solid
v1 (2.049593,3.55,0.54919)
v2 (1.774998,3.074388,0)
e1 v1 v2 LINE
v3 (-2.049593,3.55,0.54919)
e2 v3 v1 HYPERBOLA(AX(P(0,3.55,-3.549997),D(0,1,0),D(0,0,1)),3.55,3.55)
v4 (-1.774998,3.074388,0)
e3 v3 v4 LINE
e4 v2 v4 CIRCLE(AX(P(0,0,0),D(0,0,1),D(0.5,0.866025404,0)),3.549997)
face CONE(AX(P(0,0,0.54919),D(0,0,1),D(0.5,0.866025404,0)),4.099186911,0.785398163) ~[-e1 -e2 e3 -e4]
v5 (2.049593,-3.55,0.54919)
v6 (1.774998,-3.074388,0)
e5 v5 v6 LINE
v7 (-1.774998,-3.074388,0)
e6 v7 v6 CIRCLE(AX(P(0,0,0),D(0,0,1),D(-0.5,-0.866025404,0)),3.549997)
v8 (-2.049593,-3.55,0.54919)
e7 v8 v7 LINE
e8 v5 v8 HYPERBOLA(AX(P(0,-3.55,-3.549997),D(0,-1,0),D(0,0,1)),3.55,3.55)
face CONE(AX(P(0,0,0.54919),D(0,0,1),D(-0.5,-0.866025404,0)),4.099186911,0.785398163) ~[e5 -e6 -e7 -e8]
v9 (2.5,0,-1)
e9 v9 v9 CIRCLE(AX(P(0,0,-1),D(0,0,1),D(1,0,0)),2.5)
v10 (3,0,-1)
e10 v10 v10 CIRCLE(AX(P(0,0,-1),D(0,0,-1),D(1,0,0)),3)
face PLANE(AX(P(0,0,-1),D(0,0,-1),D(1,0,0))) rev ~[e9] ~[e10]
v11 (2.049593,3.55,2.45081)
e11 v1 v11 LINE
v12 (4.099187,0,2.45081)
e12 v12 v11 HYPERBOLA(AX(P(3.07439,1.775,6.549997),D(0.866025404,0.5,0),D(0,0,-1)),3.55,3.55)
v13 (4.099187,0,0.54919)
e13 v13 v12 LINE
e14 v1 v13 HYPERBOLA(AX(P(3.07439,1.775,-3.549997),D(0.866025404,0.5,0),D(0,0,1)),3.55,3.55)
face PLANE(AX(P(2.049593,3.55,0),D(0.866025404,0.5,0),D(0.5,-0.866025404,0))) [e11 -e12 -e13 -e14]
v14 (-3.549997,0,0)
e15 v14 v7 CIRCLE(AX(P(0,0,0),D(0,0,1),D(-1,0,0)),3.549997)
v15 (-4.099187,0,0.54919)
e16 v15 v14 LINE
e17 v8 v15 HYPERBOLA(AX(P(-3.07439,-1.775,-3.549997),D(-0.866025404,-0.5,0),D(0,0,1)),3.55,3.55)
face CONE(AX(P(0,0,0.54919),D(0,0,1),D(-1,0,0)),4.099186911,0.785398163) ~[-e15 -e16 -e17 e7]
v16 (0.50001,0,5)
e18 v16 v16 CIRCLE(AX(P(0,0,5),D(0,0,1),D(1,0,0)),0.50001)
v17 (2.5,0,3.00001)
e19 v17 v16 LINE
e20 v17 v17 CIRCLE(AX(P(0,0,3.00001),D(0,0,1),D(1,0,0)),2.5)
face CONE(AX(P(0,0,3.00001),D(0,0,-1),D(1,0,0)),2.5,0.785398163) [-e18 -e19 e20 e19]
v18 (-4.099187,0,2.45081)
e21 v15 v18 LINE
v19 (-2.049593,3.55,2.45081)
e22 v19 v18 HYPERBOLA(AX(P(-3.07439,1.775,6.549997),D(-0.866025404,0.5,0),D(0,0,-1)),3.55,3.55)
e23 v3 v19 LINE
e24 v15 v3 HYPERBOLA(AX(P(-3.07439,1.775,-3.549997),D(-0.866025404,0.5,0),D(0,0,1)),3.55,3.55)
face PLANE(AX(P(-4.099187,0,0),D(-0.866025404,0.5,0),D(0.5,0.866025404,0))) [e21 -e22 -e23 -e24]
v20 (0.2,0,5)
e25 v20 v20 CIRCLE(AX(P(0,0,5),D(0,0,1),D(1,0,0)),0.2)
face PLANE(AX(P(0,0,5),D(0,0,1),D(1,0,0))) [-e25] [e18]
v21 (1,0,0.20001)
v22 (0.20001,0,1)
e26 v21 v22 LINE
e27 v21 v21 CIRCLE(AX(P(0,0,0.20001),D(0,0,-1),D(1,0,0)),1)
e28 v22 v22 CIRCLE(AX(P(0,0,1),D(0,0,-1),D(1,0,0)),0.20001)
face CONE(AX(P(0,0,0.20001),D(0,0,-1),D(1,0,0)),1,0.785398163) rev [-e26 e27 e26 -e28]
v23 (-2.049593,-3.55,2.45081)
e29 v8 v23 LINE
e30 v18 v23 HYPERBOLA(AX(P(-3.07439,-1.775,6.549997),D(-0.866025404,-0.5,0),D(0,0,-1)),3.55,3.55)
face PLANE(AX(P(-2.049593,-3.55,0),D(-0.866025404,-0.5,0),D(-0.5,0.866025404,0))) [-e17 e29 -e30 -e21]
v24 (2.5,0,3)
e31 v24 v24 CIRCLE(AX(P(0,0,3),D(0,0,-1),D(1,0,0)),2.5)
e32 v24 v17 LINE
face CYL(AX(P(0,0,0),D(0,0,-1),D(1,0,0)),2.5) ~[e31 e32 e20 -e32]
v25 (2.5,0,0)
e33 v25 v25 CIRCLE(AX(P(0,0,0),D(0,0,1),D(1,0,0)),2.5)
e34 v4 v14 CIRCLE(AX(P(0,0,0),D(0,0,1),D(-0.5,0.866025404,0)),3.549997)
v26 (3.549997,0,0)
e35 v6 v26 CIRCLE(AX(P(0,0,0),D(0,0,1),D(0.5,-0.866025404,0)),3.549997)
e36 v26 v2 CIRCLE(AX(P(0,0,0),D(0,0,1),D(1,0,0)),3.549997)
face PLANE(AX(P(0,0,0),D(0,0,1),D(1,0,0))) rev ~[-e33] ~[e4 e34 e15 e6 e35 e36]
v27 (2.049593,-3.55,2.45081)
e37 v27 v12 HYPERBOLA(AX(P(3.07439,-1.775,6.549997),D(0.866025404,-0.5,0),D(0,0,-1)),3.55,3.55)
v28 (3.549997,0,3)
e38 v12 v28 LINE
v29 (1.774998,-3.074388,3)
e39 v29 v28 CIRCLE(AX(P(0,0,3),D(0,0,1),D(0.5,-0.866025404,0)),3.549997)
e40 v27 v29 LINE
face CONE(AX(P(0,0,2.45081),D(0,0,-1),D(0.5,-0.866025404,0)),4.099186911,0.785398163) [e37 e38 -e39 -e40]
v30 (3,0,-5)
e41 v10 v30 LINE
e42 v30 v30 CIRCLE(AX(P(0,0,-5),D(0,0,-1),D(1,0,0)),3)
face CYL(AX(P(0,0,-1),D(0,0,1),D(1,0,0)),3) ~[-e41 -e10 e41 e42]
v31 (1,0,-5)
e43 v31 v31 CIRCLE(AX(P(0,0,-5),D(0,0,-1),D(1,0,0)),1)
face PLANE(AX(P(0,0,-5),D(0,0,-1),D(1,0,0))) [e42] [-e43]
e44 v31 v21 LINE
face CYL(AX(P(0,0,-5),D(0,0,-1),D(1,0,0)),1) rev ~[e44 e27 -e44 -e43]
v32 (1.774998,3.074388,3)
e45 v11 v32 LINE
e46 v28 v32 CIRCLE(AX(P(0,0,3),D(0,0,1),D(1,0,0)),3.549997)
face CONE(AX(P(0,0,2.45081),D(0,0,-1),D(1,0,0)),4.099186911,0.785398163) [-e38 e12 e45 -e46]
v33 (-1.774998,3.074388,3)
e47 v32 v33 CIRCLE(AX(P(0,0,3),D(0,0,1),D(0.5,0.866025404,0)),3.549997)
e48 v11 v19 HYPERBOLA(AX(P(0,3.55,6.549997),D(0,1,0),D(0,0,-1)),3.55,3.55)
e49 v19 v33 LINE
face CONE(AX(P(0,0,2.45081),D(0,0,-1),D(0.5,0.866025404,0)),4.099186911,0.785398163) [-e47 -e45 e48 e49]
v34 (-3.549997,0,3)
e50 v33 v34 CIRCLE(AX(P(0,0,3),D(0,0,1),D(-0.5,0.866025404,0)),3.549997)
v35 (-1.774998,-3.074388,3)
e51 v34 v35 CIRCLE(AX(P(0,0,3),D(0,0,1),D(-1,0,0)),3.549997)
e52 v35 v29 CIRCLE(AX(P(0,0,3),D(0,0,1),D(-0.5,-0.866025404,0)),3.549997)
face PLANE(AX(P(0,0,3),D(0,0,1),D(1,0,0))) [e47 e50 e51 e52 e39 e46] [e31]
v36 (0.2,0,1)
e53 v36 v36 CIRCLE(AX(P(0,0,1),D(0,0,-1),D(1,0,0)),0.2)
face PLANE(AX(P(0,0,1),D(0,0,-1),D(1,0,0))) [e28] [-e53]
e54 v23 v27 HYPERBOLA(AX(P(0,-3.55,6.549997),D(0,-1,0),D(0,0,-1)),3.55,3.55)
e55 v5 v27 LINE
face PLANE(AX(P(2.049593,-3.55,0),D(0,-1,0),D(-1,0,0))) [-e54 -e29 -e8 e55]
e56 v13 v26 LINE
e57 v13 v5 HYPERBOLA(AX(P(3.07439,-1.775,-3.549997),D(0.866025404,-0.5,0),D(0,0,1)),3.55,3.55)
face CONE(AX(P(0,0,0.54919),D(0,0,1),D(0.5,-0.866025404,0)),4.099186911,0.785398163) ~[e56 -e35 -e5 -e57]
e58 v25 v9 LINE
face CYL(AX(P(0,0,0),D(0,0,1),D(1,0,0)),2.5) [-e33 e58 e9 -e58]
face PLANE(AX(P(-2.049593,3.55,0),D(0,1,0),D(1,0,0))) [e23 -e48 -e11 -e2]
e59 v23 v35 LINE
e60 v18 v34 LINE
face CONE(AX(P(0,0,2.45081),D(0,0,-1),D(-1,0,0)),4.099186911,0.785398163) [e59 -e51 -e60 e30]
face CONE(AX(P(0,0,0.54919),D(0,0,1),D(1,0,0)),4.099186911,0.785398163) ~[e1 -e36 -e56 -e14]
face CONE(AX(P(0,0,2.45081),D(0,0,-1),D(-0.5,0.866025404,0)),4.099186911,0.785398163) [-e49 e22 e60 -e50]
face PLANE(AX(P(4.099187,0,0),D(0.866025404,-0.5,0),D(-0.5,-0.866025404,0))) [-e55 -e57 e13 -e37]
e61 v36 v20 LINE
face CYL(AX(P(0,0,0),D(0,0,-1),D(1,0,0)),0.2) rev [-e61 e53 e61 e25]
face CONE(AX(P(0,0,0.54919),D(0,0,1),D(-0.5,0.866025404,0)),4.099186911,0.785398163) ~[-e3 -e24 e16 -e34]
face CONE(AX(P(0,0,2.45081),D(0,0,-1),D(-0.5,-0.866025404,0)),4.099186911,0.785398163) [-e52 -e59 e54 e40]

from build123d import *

# Parameters (mm, degrees)
F0_R      = 2.5
F0_R_2    = 0.2
F1_DEPTH  = 3
F2_SIZE   = 0.54919
F3_DEPTH  = 3.001
F4_DEPTH  = 5
F5_SIZE   = 1.99999
F6_DEPTH  = 1
F7_R      = 3
F7_R_2    = 2.5
F7_R_3    = 0.2
F8_DEPTH  = 4
F9_R      = 1
F9_R_2    = 0.2
F10_DEPTH = 6
F11_SIZE  = 0.79999


# Not quite as in the source:
# - a fillet or chamfer is up to 0.001 mm smaller than in the source, because OpenCascade refuses the exact size


with BuildPart() as f1:
    # F0 (on Top) → F1 (new body)
    with BuildSketch(Plane.XY):
        Polygon((2.0495934556, 3.55), (-2.0495934556, 3.55), (-4.0991869112, 0), (-2.0495934556, -3.55), (2.0495934556, -3.55), (4.0991869112, 0), align=None)
        Circle(F0_R, mode=Mode.SUBTRACT)
        with BuildLine():
            Line((-4.0991869112, 0), (-2.0495934556, 3.55))
            ThreePointArc((-2.0495934556, 3.55), (-3.55, 2.0495934556), (-4.0991869112, 0))
        make_face()
        with BuildLine():
            Line((-2.0495934556, -3.55), (-4.0991869112, 0))
            ThreePointArc((-4.0991869112, 0), (-3.55, -2.0495934556), (-2.0495934556, -3.55))
        make_face()
        with BuildLine():
            ThreePointArc((2.0495934556, 3.55), (0, 4.0991869112), (-2.0495934556, 3.55))
            Line((-2.0495934556, 3.55), (2.0495934556, 3.55))
        make_face()
        with BuildLine():
            ThreePointArc((4.0991869112, 0), (3.55, 2.0495934556), (2.0495934556, 3.55))
            Line((2.0495934556, 3.55), (4.0991869112, 0))
        make_face()
        with BuildLine():
            ThreePointArc((2.0495934556, -3.55), (3.55, -2.0495934556), (4.0991869112, 0))
            Line((4.0991869112, 0), (2.0495934556, -3.55))
        make_face()
        with BuildLine():
            Line((2.0495934556, -3.55), (-2.0495934556, -3.55))
            ThreePointArc((-2.0495934556, -3.55), (0, -4.0991869112), (2.0495934556, -3.55))
        make_face()
        Circle(F0_R)
        Circle(F0_R_2, mode=Mode.SUBTRACT)
    extrude(amount=F1_DEPTH)

    # F2
    f2_edges = [f1.edges().sort_by_distance(p)[0] for p in [
        (2.049593, 3.55, 3),
        (2.049593, 3.55, 0),
    ]]
    chamfer(f2_edges, length=F2_SIZE)

    # F0 (on Top) → F3 (cut, through all)
    with BuildSketch(Plane.XY):
        with BuildLine():
            Line((2.0495934556, -3.55), (-2.0495934556, -3.55))
            ThreePointArc((-2.0495934556, -3.55), (0, -4.0991869112), (2.0495934556, -3.55))
        make_face()
        with BuildLine():
            ThreePointArc((2.0495934556, -3.55), (3.55, -2.0495934556), (4.0991869112, 0))
            Line((4.0991869112, 0), (2.0495934556, -3.55))
        make_face()
        with BuildLine():
            Line((-2.0495934556, -3.55), (-4.0991869112, 0))
            ThreePointArc((-4.0991869112, 0), (-3.55, -2.0495934556), (-2.0495934556, -3.55))
        make_face()
        with BuildLine():
            ThreePointArc((4.0991869112, 0), (3.55, 2.0495934556), (2.0495934556, 3.55))
            Line((2.0495934556, 3.55), (4.0991869112, 0))
        make_face()
        with BuildLine():
            ThreePointArc((2.0495934556, 3.55), (0, 4.0991869112), (-2.0495934556, 3.55))
            Line((-2.0495934556, 3.55), (2.0495934556, 3.55))
        make_face()
        with BuildLine():
            Line((-4.0991869112, 0), (-2.0495934556, 3.55))
            ThreePointArc((-2.0495934556, 3.55), (-3.55, 2.0495934556), (-4.0991869112, 0))
        make_face()
    extrude(amount=F3_DEPTH, mode=Mode.SUBTRACT)

    # F0 (on Top) → F4 (join)
    with BuildSketch(Plane.XY):
        Circle(F0_R)
        Circle(F0_R_2, mode=Mode.SUBTRACT)
    extrude(amount=F4_DEPTH)

    # F5 (size 2 in the source; OpenCascade refuses exactly that, so slightly less here)
    f5_edges = [f1.edges().sort_by_distance(p)[0] for p in [
        (-2.5, 0, 5),
    ]]
    chamfer(f5_edges, length=F5_SIZE)

    # F0 (on Top) → F6 (join)
    with BuildSketch(Plane.XY):
        Circle(F0_R)
        Circle(F0_R_2, mode=Mode.SUBTRACT)
    extrude(amount=-F6_DEPTH)

    # F7 (on face) → F8 (join)
    with BuildSketch(Plane(origin=(0, 0, -1), x_dir=(1, 0, 0), z_dir=(0, 0, -1))):
        Circle(F7_R)
        Circle(F7_R_2, mode=Mode.SUBTRACT)
        Circle(F7_R_2)
        Circle(F7_R_3, mode=Mode.SUBTRACT)
    extrude(amount=F8_DEPTH)

    # F9 (on face) → F10 (cut)
    with BuildSketch(Plane(origin=(0, 0, -5), x_dir=(1, 0, 0), z_dir=(0, 0, -1))):
        Circle(F9_R)
        Circle(F9_R_2, mode=Mode.SUBTRACT)
    extrude(amount=-F10_DEPTH, mode=Mode.SUBTRACT)

    # F11 (size 0.8 in the source; OpenCascade refuses exactly that, so slightly less here)
    f11_edges = [f1.edges().sort_by_distance(p)[0] for p in [
        (-1, 0, 1),
    ]]
    chamfer(f11_edges, length=F11_SIZE)


solid = f1.part
